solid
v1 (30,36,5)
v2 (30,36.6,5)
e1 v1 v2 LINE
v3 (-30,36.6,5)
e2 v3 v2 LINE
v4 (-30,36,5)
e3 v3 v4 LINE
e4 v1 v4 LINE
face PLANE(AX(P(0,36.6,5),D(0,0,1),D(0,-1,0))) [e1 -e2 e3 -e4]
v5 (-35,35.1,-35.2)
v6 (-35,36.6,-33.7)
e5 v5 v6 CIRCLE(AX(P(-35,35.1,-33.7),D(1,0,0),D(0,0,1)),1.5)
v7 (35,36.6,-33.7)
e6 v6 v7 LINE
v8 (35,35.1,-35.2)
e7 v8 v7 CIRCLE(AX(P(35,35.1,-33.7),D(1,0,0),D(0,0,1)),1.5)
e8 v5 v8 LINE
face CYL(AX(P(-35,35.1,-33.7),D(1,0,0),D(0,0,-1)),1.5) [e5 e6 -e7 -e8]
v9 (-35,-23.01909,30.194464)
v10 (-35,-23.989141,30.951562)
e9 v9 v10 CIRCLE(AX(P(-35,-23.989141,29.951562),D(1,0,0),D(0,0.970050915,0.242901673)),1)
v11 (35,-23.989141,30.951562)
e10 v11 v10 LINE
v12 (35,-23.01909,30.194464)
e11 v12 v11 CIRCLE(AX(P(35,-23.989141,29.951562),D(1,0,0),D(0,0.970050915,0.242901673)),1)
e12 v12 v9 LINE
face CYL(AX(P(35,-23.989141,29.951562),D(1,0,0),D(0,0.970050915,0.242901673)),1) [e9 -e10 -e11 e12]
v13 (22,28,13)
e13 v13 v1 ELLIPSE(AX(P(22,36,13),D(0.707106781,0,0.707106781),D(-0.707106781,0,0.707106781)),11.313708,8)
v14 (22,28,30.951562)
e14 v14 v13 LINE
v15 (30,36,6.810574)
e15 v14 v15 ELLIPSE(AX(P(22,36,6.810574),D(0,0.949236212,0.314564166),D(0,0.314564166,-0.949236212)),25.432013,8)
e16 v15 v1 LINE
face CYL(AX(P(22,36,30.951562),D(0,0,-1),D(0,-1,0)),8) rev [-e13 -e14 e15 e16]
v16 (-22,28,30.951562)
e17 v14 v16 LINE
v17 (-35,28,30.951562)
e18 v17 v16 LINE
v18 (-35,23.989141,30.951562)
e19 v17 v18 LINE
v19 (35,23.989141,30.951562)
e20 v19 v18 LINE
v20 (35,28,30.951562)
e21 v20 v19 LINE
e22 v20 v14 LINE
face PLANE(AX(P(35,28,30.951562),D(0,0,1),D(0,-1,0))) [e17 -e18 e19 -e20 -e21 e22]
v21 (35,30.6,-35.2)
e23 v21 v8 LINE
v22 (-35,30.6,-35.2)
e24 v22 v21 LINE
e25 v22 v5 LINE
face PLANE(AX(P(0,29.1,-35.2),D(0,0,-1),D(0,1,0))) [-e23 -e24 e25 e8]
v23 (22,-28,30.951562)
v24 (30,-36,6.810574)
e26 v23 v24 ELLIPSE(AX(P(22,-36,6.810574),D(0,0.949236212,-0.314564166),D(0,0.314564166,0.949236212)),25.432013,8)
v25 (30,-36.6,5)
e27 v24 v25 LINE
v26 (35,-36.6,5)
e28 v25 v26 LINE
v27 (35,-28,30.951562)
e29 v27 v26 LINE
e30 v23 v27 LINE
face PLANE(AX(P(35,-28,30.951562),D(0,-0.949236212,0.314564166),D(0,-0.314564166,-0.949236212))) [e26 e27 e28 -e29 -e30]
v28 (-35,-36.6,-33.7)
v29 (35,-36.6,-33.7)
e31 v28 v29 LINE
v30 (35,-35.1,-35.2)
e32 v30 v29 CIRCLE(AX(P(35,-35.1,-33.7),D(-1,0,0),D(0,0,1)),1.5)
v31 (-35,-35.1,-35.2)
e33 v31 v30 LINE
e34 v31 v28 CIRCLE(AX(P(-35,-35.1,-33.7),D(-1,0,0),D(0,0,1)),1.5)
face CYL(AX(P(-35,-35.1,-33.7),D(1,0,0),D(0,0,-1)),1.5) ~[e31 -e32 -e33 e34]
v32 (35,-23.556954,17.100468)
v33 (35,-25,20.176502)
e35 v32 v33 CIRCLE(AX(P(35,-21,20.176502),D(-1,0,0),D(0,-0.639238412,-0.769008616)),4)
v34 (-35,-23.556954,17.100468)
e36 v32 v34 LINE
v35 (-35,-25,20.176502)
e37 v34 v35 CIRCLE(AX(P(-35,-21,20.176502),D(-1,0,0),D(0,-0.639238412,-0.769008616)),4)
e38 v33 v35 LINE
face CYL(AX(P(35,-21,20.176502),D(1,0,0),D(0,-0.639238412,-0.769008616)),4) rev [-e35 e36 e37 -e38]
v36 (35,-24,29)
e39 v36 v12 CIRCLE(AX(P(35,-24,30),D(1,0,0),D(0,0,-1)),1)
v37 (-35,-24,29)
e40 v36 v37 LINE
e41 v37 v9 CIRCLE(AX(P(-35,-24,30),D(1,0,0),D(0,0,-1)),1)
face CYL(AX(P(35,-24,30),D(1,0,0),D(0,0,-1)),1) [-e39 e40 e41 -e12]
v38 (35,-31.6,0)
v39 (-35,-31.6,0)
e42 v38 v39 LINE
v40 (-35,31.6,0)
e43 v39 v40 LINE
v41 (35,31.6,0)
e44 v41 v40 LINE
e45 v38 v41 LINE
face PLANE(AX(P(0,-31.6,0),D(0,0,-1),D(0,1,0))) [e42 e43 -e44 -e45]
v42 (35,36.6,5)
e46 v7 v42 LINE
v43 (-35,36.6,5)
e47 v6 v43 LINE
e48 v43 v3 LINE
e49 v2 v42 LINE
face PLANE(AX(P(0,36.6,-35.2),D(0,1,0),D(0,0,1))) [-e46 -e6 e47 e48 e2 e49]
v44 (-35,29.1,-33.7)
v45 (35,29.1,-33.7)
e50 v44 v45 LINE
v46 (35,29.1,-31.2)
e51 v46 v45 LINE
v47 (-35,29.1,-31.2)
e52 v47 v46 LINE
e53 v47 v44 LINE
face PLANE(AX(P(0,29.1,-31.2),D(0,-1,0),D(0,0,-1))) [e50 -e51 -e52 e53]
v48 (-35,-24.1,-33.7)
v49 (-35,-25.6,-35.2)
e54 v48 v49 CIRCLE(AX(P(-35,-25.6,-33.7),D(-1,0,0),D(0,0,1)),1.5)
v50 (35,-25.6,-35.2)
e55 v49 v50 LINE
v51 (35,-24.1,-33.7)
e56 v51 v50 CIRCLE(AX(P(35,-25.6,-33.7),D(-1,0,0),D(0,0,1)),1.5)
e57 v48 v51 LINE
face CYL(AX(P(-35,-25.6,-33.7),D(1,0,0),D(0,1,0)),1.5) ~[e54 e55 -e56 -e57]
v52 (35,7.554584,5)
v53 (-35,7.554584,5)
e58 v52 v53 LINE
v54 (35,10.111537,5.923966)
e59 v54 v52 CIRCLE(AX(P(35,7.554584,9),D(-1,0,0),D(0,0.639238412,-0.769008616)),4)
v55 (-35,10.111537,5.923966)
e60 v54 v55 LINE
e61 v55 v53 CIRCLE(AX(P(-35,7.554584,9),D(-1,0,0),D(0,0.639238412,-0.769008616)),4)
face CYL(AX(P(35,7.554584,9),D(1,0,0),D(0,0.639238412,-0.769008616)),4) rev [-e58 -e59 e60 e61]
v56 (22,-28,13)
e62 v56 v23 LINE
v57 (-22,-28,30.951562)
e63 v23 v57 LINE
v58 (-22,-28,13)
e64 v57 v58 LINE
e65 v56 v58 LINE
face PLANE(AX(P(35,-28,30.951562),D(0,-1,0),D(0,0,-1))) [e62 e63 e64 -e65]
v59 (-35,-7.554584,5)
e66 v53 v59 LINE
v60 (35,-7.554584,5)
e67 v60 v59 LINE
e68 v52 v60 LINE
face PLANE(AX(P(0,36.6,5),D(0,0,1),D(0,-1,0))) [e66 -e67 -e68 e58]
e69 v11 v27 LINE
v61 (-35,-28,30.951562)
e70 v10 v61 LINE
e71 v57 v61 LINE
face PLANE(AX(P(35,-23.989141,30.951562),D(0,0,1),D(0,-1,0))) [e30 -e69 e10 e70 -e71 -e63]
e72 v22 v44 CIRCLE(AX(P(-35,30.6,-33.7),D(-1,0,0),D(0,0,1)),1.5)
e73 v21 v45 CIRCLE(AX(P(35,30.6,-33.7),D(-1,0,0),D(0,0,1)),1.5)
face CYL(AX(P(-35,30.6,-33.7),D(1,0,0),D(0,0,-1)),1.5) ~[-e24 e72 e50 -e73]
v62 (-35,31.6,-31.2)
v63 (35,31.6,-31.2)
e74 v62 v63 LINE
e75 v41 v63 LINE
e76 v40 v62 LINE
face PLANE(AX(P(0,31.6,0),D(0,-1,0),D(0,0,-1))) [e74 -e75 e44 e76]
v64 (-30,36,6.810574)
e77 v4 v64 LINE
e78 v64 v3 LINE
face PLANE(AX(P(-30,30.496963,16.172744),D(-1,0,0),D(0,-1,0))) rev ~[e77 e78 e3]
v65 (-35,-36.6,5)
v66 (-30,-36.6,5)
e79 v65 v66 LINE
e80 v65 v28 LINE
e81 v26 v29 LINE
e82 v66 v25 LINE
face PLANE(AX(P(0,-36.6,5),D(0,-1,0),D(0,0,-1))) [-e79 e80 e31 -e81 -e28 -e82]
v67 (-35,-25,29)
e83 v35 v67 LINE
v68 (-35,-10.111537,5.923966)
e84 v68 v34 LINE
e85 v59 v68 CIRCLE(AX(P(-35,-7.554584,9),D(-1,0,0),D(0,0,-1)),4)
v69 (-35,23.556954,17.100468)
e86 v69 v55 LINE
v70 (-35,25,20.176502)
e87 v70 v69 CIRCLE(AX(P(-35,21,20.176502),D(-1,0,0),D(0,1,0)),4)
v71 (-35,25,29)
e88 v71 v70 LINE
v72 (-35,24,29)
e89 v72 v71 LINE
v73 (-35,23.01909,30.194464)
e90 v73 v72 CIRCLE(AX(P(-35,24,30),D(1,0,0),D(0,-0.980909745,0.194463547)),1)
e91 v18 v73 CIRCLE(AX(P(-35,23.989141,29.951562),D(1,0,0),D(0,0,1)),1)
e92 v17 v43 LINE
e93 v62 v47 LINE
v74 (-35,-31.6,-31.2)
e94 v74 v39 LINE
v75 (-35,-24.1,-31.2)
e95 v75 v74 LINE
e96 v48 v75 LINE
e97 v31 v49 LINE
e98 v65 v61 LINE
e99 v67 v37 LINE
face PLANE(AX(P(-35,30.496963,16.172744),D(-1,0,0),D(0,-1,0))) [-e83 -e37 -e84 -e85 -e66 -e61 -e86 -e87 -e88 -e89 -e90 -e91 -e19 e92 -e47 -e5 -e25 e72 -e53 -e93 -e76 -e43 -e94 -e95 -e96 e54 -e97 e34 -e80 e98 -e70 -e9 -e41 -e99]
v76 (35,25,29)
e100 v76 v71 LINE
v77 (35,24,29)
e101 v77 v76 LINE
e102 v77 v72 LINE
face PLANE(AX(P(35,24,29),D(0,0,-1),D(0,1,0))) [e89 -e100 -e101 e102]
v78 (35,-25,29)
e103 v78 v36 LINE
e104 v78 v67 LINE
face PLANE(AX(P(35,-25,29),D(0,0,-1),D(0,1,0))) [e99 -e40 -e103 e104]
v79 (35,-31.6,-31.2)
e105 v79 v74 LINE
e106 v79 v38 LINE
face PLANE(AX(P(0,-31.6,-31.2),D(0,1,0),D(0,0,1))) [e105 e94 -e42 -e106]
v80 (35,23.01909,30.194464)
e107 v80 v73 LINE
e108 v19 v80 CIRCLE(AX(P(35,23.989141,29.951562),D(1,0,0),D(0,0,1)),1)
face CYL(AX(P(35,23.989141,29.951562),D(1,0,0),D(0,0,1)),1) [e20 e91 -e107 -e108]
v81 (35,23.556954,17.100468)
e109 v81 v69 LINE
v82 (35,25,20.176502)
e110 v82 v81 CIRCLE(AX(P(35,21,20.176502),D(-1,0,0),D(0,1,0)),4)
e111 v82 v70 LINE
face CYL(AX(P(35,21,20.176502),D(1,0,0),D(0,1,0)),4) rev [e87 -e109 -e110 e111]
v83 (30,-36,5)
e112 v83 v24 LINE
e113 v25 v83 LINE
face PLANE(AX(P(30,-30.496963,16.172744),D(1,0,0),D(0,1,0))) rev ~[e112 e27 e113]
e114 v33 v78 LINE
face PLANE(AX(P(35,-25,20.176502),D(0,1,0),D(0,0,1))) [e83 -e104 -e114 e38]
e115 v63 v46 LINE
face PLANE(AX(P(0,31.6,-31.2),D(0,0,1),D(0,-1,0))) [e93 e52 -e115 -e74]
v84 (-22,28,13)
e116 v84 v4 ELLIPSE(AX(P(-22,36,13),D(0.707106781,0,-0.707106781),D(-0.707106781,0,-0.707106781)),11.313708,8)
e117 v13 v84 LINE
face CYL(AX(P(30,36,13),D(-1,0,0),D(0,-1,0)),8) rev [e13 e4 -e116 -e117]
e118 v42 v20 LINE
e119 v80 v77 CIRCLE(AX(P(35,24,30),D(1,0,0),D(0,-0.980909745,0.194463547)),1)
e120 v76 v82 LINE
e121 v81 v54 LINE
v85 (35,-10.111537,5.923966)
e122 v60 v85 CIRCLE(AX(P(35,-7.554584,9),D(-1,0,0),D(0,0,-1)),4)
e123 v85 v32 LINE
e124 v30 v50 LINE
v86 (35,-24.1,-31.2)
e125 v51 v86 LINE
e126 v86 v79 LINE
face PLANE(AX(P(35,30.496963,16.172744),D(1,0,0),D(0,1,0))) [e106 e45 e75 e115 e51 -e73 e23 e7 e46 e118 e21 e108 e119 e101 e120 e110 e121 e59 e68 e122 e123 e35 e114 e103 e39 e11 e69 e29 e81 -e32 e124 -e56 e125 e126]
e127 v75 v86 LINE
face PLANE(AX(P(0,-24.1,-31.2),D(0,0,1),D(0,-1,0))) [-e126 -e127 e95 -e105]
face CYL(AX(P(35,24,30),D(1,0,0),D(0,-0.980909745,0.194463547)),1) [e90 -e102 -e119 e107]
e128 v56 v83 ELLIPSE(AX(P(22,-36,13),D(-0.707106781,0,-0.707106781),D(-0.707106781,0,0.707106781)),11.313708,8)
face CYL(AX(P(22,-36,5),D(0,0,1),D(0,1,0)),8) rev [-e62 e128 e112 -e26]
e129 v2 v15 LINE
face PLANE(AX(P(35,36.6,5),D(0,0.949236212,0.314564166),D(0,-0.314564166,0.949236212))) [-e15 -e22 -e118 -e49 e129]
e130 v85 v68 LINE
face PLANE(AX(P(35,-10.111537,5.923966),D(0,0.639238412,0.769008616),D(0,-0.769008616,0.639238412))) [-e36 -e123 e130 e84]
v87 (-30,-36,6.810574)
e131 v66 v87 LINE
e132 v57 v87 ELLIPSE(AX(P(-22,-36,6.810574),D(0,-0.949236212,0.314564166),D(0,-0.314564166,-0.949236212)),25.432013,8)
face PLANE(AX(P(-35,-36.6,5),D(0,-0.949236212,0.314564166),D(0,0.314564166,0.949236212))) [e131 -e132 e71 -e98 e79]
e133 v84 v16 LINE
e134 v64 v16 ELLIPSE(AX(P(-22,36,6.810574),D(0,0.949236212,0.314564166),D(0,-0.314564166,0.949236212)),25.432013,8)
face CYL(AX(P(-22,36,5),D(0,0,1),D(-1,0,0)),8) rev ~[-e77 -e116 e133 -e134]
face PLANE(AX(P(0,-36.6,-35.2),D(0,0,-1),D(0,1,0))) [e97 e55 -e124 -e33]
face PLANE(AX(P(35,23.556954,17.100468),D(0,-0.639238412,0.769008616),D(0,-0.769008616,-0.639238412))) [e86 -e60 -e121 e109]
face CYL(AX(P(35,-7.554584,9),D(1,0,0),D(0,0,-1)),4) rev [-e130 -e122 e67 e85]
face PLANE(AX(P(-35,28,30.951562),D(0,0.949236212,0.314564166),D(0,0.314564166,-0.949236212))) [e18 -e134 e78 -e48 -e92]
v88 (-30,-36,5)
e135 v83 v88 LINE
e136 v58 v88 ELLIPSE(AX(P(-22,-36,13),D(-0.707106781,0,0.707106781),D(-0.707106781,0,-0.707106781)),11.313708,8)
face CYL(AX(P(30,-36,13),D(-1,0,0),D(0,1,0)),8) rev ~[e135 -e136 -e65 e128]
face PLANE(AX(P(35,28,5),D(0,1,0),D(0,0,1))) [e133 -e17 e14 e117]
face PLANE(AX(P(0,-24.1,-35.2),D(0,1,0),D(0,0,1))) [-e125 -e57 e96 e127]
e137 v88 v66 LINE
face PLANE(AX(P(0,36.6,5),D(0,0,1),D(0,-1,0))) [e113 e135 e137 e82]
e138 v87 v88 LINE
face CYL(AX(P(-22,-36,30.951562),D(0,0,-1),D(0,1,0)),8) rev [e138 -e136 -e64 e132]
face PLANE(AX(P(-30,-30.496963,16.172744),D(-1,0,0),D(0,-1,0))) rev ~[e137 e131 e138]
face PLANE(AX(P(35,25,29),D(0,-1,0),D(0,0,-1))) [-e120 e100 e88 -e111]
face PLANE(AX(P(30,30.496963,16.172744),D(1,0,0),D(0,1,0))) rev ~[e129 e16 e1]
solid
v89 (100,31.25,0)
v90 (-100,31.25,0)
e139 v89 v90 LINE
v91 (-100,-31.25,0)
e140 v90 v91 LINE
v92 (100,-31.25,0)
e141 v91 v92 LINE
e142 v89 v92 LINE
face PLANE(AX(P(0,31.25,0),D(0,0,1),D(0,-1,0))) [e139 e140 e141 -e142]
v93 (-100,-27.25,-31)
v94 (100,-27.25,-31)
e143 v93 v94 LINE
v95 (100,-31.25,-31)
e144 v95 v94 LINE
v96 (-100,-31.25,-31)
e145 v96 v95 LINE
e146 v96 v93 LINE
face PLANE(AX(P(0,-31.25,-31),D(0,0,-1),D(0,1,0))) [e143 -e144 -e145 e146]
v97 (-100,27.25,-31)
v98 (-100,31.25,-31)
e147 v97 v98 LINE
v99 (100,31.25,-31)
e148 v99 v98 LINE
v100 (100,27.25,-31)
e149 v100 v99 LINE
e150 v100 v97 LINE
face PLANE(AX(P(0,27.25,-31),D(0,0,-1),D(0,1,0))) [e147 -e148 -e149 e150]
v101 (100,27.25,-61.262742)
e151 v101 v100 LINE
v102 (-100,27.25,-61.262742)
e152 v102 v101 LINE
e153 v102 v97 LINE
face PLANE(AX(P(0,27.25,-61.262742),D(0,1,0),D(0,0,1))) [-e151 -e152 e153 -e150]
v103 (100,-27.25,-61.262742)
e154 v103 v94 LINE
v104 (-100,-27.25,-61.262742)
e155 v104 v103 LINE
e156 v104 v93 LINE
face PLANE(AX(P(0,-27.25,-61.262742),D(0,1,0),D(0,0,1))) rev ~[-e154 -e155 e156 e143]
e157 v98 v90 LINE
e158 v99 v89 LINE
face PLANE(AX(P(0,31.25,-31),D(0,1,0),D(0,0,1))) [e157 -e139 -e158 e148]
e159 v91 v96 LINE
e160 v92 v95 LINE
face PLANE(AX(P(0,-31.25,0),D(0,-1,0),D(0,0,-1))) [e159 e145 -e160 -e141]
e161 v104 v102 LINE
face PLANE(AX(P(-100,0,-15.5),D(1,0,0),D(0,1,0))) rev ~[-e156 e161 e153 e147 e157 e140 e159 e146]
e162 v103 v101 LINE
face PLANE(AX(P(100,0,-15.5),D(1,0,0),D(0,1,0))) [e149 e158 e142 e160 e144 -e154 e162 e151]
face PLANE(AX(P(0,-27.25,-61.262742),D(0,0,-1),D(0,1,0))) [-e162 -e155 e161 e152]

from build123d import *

# Parameters (mm, degrees)
F0_W      = 54.5
F0_H      = 30.2627416849
F1_DEPTH  = 100
F2_W      = 5
F2_H      = 4
F3_DEPTH  = 35
F5_DEPTH  = 70
F8_DEPTH  = 5
F10_DEPTH = 5
F11_R     = 8
F12_R     = 1.5


with BuildPart() as f1:
    # F0 (on Right) → F1 (new body, symmetric)
    with BuildSketch(Plane.YZ):
        Polygon((31.25, 0), (-31.25, 0), (-31.25, -31), (-27.25, -31), (27.25, -31), (31.25, -31), align=None)
        with Locations((0, -46.1313708425)):
            Rectangle(F0_W, F0_H)
    extrude(amount=F1_DEPTH, both=True)


with BuildPart() as f3:
    # F2 (on Right) → F3 (new body, symmetric)
    with BuildSketch(Plane.YZ):
        Polygon((0, 5), (0, 0), (31.6, 0), (31.6, -31.2), (29.1, -31.2), (29.1, -35.2), (36.6, -35.2), (36.6, 5), align=None)
        Polygon((-31.6, 0), (0, 0), (0, 5), (-36.6, 5), (-36.6, -35.2), (-29.1, -35.2), (-29.1, -31.2), (-31.6, -31.2), align=None)
        with Locations((-26.6, -33.2)):
            Rectangle(F2_W, F2_H)
    extrude(amount=F3_DEPTH, both=True)

    # F4 (on face) → F5 (join, through all)
    with BuildSketch(Plane.YZ.offset(35)):
        with BuildLine():
            Line((-28, 5), (-7.5545838353, 5))
            ThreePointArc((-7.5545838353, 5), (-8.9139701192, 5.238076432), (-10.1115374849, 5.9239655343))
            Line((-10.1115374849, 5.9239655343), (-23.5569536496, 17.1004677212))
            ThreePointArc((-23.5569536496, 17.1004677212), (-24.6213129248, 18.4776517812), (-25, 20.1765021869))
            Line((-25, 20.1765021869), (-25, 29))
            Line((-25, 29), (-24, 29))
            ThreePointArc((-24, 29), (-23.227192279, 29.3653597662), (-23.0190902545, 30.1944635473))
            ThreePointArc((-23.0190902545, 30.1944635473), (-23.3738776782, 30.7398834056), (-23.9891411693, 30.9515618745))
            Line((-23.9891411693, 30.9515618745), (-28, 30.9515618745))
            Line((-28, 30.9515618745), (-28, 5))
        make_face()
        with BuildLine():
            Line((25, 5), (25, 20.1765021869))
            ThreePointArc((25, 20.1765021869), (24.6213129248, 18.4776517812), (23.5569536496, 17.1004677212))
            Line((23.5569536496, 17.1004677212), (10.1115374849, 5.9239655343))
            ThreePointArc((10.1115374849, 5.9239655343), (8.9139701192, 5.238076432), (7.5545838353, 5))
            Line((7.5545838353, 5), (25, 5))
        make_face()
        with BuildLine():
            Line((24, 29), (25, 29))
            Line((25, 29), (25, 20.1765021869))
            Line((25, 20.1765021869), (25, 5))
            Line((25, 5), (28, 5))
            Line((28, 5), (28, 30.9515618745))
            Line((28, 30.9515618745), (23.9891411693, 30.9515618745))
            ThreePointArc((23.9891411693, 30.9515618745), (23.3738776782, 30.7398834056), (23.0190902545, 30.1944635473))
            ThreePointArc((23.0190902545, 30.1944635473), (23.227192279, 29.3653597662), (24, 29))
        make_face()
    extrude(amount=-F5_DEPTH)

    # F6: union 

    # F7 (on face) → F8 (join)
    with BuildSketch(Plane.YZ.offset(35)):
        Polygon((28, 30.9515618745), (28, 5), (36.6, 5), align=None)
        Polygon((-28, 30.9515618745), (-36.6, 5), (-28, 5), align=None)
    extrude(amount=-F8_DEPTH)

    # F9 (on face) → F10 (join)
    with BuildSketch(Plane(origin=(-35, 0, 0), x_dir=(0, -1, 0), z_dir=(-1, 0, 0))):
        Polygon((-28, 30.9515618745), (-36.6, 5), (-28, 5), align=None)
        Polygon((36.6, 5), (28, 30.9515618745), (28, 5), align=None)
    extrude(amount=-F10_DEPTH)

    # F11
    f11_edges = [f3.edges().sort_by_distance(p)[0] for p in [
        (0, 28, 5),
        (30, -28, 17.975781),
        (-30, -28, 17.975781),
        (30, 28, 17.975781),
        (-30, 28, 17.975781),
        (0, -28, 5),
    ]]
    fillet(f11_edges, radius=F11_R)

    # F12
    f12_edges = [f3.edges().sort_by_distance(p)[0] for p in [
        (0, -36.6, -35.2),
        (0, 36.6, -35.2),
        (0, 29.1, -35.2),
        (0, -24.1, -35.2),
    ]]
    fillet(f12_edges, radius=F12_R)


solid = Compound([f1.part, f3.part])
